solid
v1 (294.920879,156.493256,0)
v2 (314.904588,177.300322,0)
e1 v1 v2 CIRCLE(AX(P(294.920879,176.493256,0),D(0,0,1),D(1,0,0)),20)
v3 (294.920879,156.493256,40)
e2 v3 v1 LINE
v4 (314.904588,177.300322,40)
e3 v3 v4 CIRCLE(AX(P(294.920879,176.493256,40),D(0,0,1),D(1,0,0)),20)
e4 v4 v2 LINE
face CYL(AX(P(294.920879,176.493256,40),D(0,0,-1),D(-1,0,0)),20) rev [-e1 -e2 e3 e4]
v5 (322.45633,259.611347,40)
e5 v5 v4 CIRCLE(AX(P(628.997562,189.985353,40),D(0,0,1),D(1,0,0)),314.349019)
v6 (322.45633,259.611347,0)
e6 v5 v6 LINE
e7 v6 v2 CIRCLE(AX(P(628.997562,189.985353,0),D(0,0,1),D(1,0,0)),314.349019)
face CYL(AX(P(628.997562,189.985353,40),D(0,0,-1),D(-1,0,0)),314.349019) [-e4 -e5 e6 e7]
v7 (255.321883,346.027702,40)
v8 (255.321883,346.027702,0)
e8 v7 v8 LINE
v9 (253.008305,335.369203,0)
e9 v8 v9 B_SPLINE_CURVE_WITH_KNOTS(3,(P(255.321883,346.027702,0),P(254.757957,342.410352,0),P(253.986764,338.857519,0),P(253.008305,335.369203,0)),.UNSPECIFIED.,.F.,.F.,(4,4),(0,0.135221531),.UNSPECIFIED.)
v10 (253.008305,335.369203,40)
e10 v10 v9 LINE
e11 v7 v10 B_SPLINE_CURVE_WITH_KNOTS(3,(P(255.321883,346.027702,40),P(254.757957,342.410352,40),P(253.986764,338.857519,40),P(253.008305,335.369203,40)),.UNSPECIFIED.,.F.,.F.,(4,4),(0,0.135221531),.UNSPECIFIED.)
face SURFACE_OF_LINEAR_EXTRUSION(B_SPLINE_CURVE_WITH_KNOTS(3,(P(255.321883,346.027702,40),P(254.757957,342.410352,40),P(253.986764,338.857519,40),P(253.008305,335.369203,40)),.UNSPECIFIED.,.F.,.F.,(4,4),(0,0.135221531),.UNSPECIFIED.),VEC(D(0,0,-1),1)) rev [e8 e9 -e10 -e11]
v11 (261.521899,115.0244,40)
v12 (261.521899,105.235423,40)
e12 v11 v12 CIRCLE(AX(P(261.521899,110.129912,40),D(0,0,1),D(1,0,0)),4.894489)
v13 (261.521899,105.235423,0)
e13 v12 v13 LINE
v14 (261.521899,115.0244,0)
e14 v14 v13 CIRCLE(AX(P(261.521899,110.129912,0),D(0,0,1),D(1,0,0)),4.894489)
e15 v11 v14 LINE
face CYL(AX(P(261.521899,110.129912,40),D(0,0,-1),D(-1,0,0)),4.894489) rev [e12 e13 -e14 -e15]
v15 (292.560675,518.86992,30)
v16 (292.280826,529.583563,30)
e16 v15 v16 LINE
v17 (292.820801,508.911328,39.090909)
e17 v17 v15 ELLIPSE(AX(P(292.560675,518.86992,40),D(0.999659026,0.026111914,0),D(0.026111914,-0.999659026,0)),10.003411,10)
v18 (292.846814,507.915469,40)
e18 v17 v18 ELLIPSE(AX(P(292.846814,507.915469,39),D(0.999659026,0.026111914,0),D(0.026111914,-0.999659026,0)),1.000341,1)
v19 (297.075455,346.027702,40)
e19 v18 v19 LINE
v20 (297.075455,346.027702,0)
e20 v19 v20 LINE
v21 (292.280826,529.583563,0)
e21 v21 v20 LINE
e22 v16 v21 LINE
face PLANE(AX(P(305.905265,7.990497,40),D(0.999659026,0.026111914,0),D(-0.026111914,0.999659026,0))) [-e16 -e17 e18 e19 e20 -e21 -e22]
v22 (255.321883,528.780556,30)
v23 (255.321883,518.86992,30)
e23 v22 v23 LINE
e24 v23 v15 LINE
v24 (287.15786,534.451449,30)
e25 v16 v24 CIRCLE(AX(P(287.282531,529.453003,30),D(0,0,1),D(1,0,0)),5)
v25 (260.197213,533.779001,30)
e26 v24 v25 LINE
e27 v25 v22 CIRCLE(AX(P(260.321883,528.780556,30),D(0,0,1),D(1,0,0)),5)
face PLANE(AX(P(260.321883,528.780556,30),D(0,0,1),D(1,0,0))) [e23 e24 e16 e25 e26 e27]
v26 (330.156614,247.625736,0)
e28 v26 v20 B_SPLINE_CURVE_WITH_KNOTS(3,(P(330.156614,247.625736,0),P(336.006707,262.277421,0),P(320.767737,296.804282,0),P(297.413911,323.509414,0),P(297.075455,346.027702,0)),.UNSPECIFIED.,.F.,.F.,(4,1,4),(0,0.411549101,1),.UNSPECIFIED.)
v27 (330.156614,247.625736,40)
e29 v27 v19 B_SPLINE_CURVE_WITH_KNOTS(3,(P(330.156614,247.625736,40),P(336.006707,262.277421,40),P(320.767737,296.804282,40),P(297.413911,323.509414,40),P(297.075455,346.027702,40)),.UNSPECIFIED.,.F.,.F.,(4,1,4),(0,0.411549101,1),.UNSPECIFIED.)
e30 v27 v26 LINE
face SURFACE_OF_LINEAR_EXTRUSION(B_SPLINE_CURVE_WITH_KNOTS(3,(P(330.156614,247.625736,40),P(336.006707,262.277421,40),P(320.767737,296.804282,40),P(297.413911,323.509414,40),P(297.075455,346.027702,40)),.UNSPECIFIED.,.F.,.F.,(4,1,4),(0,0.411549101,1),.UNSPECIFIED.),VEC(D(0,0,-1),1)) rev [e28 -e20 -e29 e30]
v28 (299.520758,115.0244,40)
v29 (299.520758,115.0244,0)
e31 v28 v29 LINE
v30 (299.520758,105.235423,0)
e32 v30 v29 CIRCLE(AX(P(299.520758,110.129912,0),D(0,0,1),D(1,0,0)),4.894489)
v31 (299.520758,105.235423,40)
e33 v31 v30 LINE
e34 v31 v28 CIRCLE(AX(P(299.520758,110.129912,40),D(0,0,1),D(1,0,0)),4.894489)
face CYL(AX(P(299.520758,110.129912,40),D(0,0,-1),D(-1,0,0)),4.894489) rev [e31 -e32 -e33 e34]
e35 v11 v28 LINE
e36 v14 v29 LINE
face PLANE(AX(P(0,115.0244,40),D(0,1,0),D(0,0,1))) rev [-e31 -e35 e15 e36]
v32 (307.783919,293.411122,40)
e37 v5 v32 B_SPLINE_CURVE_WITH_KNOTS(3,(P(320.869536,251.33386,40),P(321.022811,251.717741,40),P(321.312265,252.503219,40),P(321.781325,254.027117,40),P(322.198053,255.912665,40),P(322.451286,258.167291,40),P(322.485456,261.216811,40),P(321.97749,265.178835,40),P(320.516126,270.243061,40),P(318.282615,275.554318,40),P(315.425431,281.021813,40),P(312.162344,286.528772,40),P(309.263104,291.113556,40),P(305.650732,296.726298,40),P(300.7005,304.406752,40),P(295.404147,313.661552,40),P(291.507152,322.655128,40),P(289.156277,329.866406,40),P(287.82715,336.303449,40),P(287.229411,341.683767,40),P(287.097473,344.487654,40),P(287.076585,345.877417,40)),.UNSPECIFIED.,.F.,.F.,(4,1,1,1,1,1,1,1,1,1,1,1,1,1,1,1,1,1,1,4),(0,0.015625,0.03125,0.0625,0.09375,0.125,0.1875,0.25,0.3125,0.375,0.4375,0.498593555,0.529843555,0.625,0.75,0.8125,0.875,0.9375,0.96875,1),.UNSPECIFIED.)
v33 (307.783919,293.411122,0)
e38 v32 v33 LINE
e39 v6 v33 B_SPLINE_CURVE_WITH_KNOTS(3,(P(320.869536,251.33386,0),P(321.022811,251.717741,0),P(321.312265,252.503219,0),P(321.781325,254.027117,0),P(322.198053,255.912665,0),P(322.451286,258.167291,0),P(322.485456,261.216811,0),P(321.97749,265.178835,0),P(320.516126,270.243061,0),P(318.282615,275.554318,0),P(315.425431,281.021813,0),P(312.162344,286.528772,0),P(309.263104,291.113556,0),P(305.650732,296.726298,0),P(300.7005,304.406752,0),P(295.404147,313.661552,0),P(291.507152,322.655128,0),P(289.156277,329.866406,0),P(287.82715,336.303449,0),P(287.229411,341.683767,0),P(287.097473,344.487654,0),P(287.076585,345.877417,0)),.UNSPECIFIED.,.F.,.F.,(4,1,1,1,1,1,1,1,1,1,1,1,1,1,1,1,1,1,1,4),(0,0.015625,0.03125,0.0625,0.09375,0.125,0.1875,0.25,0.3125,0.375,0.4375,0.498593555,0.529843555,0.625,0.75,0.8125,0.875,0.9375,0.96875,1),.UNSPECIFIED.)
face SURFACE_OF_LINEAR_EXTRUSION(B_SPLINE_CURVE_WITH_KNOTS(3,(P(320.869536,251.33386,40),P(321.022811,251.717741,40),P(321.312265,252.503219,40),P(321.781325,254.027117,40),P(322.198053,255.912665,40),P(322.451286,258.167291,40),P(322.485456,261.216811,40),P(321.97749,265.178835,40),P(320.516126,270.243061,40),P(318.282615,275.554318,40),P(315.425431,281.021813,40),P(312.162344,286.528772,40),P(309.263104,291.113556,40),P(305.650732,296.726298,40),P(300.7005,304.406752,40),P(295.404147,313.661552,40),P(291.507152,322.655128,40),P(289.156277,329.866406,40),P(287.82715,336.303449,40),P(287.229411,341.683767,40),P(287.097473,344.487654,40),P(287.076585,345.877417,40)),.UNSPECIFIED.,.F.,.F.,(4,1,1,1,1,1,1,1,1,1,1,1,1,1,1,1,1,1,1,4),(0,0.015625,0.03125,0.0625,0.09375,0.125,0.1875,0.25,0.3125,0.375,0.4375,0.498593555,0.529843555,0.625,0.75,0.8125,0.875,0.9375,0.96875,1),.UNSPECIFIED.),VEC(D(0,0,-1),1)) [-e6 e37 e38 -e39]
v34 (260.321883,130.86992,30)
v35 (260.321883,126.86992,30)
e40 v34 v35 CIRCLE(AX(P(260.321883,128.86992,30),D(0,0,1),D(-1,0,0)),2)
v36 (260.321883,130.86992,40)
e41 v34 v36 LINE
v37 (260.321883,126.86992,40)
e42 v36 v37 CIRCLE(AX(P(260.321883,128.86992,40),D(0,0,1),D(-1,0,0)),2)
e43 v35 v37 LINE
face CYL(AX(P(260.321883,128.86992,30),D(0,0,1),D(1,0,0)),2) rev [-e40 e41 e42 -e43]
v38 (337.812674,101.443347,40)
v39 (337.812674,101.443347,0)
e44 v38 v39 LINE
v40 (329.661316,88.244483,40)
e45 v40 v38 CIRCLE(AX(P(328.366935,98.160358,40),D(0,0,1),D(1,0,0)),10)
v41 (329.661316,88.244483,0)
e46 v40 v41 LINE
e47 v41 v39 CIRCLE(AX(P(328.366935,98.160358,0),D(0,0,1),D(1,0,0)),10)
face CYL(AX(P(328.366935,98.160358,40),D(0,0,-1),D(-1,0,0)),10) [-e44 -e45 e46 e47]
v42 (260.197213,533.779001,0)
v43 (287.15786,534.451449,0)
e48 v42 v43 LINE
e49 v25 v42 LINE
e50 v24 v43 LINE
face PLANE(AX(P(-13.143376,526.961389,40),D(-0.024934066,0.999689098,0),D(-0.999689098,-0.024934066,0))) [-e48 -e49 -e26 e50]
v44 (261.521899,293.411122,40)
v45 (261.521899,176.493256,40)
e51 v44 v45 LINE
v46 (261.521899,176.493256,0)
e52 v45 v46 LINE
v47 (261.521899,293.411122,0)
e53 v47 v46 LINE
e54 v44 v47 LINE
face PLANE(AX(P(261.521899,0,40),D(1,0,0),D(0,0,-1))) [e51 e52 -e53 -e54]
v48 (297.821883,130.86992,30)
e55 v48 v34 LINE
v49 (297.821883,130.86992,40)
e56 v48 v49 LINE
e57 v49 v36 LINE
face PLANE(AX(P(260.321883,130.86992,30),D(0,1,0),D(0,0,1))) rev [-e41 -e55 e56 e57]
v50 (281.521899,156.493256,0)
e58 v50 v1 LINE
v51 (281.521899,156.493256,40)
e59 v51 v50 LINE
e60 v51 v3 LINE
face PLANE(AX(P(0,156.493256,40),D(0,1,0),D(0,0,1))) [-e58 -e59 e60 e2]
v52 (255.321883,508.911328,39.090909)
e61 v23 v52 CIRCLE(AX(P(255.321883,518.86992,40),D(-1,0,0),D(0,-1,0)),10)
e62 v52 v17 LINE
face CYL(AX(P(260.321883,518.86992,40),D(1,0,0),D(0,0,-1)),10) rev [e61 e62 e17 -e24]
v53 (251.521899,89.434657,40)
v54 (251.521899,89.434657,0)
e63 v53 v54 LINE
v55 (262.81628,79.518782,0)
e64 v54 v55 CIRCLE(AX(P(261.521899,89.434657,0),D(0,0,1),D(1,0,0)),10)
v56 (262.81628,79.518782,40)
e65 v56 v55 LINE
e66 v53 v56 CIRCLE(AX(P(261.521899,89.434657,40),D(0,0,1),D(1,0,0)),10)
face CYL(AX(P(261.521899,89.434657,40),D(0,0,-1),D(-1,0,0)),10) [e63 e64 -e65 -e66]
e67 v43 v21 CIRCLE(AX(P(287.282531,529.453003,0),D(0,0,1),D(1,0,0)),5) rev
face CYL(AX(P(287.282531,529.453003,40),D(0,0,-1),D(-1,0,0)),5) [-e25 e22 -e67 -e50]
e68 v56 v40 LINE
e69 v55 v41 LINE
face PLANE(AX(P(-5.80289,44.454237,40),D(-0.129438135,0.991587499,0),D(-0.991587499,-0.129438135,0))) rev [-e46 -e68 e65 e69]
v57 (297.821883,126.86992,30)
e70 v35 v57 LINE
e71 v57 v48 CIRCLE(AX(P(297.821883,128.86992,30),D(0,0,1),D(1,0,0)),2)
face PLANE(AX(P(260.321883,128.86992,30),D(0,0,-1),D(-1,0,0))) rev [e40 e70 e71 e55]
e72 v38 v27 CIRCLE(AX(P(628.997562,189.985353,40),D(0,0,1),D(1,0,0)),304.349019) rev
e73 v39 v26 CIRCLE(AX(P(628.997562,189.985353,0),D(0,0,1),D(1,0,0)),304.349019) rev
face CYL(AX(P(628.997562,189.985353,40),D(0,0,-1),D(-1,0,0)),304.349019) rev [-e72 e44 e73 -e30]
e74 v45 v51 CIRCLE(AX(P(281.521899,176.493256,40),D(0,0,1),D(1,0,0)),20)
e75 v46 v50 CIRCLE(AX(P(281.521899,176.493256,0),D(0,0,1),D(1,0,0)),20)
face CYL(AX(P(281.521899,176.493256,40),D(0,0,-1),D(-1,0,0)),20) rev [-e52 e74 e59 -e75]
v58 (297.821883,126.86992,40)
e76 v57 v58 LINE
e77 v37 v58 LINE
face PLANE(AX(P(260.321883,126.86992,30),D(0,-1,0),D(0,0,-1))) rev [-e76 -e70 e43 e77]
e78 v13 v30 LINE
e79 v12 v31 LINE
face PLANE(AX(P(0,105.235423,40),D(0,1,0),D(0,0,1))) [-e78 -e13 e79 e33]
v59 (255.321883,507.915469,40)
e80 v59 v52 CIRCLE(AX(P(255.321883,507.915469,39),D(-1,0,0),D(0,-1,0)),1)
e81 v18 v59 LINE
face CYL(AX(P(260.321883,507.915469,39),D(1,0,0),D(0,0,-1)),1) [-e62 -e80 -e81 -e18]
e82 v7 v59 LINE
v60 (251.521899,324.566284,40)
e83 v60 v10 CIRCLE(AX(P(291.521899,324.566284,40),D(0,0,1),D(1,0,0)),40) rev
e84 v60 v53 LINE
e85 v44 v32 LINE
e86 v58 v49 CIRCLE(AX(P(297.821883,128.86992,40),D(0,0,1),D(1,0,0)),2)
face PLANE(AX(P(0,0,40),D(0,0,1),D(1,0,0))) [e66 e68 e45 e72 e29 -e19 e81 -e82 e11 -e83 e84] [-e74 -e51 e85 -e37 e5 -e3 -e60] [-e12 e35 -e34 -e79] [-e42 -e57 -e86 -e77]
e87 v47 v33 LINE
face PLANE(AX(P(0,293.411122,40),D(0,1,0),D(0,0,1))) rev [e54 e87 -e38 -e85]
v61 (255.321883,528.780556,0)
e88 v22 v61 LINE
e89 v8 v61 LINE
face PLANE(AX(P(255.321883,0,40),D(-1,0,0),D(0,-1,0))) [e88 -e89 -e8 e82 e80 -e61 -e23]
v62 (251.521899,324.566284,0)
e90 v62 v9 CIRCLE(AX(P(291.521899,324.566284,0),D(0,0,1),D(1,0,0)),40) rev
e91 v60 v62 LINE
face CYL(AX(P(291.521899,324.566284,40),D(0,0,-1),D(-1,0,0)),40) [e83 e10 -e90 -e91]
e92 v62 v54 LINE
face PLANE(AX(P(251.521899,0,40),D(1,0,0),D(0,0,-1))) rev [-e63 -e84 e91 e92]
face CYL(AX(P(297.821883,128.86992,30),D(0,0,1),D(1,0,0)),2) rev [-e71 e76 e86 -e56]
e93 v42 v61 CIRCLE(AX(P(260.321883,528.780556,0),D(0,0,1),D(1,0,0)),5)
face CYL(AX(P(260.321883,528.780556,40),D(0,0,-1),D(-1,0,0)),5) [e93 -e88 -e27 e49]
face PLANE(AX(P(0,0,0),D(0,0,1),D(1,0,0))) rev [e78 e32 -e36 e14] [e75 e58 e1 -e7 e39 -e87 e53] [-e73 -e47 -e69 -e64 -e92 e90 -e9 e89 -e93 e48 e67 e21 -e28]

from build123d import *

# Parameters (mm, degrees)
BOSS_EXTRUDE3_DEPTH = 40
CUT_EXTRUDE1_START  = -10
CUT_EXTRUDE1_DEPTH  = 10
FILLET3_R           = 10
FILLET4_R           = 1
CUT_EXTRUDE3_DEPTH  = 634.823473561


with BuildPart() as part:
    # Sketch1 → Boss-Extrude3 (new body)
    with BuildSketch(Plane.XY):
        with BuildLine():
            Line((287.157860281, 534.451448831), (260.19721277, 533.779001198))
            ThreePointArc((260.19721277, 533.779001198), (256.742542962, 532.271733759), (255.321883101, 528.780555709))
            Line((255.321883101, 528.780555709), (255.321883101, 346.027702032))
            Line((255.321883101, 346.027702032), (255.321883101, 298.309919691))
            Line((255.321883101, 298.309919691), (298.321883101, 298.309919691))
            Line((298.321883101, 298.309919691), (297.107965759, 344.783089771))
            add(Edge.make_bspline(
                [(297.107965759, 344.783089771), (297.092597, 345.195665623), (297.081725868, 345.610516215), (297.075455466, 346.027702032)],
                knots=[0.989098045, 0.989098045, 0.989098045, 0.989098045, 1, 1, 1, 1], degree=3))
            Line((297.075455466, 346.027702032), (292.280825741, 529.583562912))
            ThreePointArc((292.280825741, 529.583562912), (290.726675353, 533.077622908), (287.157860281, 534.451448831))
        make_face()
        with BuildLine():
            Line((255.321883101, 298.309919691), (255.321883101, 346.027702032))
            add(Edge.make_bspline(
                [(255.321883101, 346.027702032), (254.757957002, 342.410351737), (253.98676421, 338.857518857), (253.008304725, 335.36920339)],
                knots=[0, 0, 0, 0, 0.135221531, 0.135221531, 0.135221531, 0.135221531], degree=3))
            ThreePointArc((253.008304725, 335.36920339), (251.895242603, 330.018633631), (251.521898803, 324.566283821))
            Line((251.521898803, 324.566283821), (251.521898803, 112.494253422))
            Line((251.521898803, 112.494253422), (251.521898803, 107.975148622))
            Line((251.521898803, 107.975148622), (251.521898803, 107.687415528))
            Line((251.521898803, 107.687415528), (251.521898803, 107.377085198))
            Line((251.521898803, 107.377085198), (251.521898803, 89.434656666))
            ThreePointArc((251.521898803, 89.434656666), (254.924316425, 81.919877444), (262.816280156, 79.518781671))
            Line((262.816280156, 79.518781671), (276.783936318, 81.342067431))
            Line((276.783936318, 81.342067431), (329.661316312, 88.244483474))
            ThreePointArc((329.661316312, 88.244483474), (336.875168963, 92.905840971), (337.812674038, 101.443346932))
            ThreePointArc((337.812674038, 101.443346932), (325.065095163, 174.067394927), (330.156614349, 247.625736037))
            add(Edge.make_bspline(
                [(330.156614349, 247.625736037), (336.006706917, 262.277420591), (320.933871266, 296.427871643), (297.92215095, 322.926208236), (297.107965759, 344.783089771)],
                knots=[0, 0, 0, 0, 0.411549101, 0.989098045, 0.989098045, 0.989098045, 0.989098045], degree=3))
            Line((297.107965759, 344.783089771), (298.321883101, 298.309919691))
            Line((298.321883101, 298.309919691), (255.321883101, 298.309919691))
        make_face()
    extrude(amount=BOSS_EXTRUDE3_DEPTH)

    # Sketch3 → Cut-Extrude1 (cut)
    with BuildSketch(Plane.XY.offset(40).offset(CUT_EXTRUDE1_START)):
        with BuildLine():
            Line((255.321883101, 508.869919691), (292.821883101, 508.869919691))
            Line((292.821883101, 508.869919691), (292.280825741, 529.583562912))
            ThreePointArc((292.280825741, 529.583562912), (290.726675353, 533.077622908), (287.157860281, 534.451448831))
            Line((287.157860281, 534.451448831), (260.19721277, 533.779001198))
            ThreePointArc((260.19721277, 533.779001198), (256.742542962, 532.271733759), (255.321883101, 528.780555709))
            Line((255.321883101, 528.780555709), (255.321883101, 508.869919691))
        make_face()
        with BuildLine():
            Line((260.321883101, 126.869919691), (297.821883101, 126.869919691))
            ThreePointArc((297.821883101, 126.869919691), (299.821883101, 128.869919691), (297.821883101, 130.869919691))
            Line((297.821883101, 130.869919691), (260.321883101, 130.869919691))
            ThreePointArc((260.321883101, 130.869919691), (258.321883101, 128.869919691), (260.321883101, 126.869919691))
        make_face()
    extrude(amount=CUT_EXTRUDE1_DEPTH, mode=Mode.SUBTRACT)

    # Fillet3
    fillet3_edges = [part.edges().sort_by_distance(p)[0] for p in [
        (274.071883101, 508.869919691, 30),
    ]]
    fillet(fillet3_edges, radius=FILLET3_R - 0.0001)  # a hair under: the kernel refuses the full size

    # Fillet4
    fillet4_edges = [part.edges().sort_by_distance(p)[0] for p in [
        (274.071883101, 508.869919691, 40),
    ]]
    fillet(fillet4_edges, radius=FILLET4_R)

    # Sketch7 → Cut-Extrude3 (cut, through all)
    with BuildSketch(Plane.XY):
        with BuildLine():
            Line((261.521898803, 105.235423074), (299.520758285, 105.235423074))
            ThreePointArc((299.520758285, 105.235423074), (304.415246799, 110.129911588), (299.520758285, 115.024400103))
            Line((299.520758285, 115.024400103), (261.521898803, 115.024400103))
            ThreePointArc((261.521898803, 115.024400103), (256.627410288, 110.129911588), (261.521898803, 105.235423074))
        make_face()
        with BuildLine():
            Line((307.783918876, 293.411121556), (261.521898803, 293.411121556))
            Line((261.521898803, 293.411121556), (261.521898803, 176.49325551))
            ThreePointArc((261.521898803, 176.49325551), (267.379763179, 162.351119886), (281.521898803, 156.49325551))
            Line((281.521898803, 156.49325551), (294.92087878, 156.49325551))
            ThreePointArc((294.92087878, 156.49325551), (309.345533596, 162.639399244), (314.90458823, 177.300322166))
            ThreePointArc((314.90458823, 177.300322166), (315.963249783, 218.705128996), (322.4563298, 259.611347408))
            add(Edge.make_bspline(
                [(322.4563298, 259.611347408), (322.456016347, 259.894497294), (322.421435552, 261.716157514), (321.977489562, 265.178835066), (320.516125801, 270.243060555), (318.282615138, 275.554318374), (315.425430629, 281.021812849), (312.162343995, 286.528772314), (309.555661166, 290.650913462), (308.084642597, 292.943229146), (307.783918876, 293.411121556)],
                knots=[0.113442682, 0.113442682, 0.113442682, 0.113442682, 0.125, 0.1875, 0.25, 0.3125, 0.375, 0.4375, 0.498593555, 0.514218555, 0.514218555, 0.514218555, 0.514218555], degree=3))
        make_face()
    extrude(amount=CUT_EXTRUDE3_DEPTH, mode=Mode.SUBTRACT)


solid = part.part
